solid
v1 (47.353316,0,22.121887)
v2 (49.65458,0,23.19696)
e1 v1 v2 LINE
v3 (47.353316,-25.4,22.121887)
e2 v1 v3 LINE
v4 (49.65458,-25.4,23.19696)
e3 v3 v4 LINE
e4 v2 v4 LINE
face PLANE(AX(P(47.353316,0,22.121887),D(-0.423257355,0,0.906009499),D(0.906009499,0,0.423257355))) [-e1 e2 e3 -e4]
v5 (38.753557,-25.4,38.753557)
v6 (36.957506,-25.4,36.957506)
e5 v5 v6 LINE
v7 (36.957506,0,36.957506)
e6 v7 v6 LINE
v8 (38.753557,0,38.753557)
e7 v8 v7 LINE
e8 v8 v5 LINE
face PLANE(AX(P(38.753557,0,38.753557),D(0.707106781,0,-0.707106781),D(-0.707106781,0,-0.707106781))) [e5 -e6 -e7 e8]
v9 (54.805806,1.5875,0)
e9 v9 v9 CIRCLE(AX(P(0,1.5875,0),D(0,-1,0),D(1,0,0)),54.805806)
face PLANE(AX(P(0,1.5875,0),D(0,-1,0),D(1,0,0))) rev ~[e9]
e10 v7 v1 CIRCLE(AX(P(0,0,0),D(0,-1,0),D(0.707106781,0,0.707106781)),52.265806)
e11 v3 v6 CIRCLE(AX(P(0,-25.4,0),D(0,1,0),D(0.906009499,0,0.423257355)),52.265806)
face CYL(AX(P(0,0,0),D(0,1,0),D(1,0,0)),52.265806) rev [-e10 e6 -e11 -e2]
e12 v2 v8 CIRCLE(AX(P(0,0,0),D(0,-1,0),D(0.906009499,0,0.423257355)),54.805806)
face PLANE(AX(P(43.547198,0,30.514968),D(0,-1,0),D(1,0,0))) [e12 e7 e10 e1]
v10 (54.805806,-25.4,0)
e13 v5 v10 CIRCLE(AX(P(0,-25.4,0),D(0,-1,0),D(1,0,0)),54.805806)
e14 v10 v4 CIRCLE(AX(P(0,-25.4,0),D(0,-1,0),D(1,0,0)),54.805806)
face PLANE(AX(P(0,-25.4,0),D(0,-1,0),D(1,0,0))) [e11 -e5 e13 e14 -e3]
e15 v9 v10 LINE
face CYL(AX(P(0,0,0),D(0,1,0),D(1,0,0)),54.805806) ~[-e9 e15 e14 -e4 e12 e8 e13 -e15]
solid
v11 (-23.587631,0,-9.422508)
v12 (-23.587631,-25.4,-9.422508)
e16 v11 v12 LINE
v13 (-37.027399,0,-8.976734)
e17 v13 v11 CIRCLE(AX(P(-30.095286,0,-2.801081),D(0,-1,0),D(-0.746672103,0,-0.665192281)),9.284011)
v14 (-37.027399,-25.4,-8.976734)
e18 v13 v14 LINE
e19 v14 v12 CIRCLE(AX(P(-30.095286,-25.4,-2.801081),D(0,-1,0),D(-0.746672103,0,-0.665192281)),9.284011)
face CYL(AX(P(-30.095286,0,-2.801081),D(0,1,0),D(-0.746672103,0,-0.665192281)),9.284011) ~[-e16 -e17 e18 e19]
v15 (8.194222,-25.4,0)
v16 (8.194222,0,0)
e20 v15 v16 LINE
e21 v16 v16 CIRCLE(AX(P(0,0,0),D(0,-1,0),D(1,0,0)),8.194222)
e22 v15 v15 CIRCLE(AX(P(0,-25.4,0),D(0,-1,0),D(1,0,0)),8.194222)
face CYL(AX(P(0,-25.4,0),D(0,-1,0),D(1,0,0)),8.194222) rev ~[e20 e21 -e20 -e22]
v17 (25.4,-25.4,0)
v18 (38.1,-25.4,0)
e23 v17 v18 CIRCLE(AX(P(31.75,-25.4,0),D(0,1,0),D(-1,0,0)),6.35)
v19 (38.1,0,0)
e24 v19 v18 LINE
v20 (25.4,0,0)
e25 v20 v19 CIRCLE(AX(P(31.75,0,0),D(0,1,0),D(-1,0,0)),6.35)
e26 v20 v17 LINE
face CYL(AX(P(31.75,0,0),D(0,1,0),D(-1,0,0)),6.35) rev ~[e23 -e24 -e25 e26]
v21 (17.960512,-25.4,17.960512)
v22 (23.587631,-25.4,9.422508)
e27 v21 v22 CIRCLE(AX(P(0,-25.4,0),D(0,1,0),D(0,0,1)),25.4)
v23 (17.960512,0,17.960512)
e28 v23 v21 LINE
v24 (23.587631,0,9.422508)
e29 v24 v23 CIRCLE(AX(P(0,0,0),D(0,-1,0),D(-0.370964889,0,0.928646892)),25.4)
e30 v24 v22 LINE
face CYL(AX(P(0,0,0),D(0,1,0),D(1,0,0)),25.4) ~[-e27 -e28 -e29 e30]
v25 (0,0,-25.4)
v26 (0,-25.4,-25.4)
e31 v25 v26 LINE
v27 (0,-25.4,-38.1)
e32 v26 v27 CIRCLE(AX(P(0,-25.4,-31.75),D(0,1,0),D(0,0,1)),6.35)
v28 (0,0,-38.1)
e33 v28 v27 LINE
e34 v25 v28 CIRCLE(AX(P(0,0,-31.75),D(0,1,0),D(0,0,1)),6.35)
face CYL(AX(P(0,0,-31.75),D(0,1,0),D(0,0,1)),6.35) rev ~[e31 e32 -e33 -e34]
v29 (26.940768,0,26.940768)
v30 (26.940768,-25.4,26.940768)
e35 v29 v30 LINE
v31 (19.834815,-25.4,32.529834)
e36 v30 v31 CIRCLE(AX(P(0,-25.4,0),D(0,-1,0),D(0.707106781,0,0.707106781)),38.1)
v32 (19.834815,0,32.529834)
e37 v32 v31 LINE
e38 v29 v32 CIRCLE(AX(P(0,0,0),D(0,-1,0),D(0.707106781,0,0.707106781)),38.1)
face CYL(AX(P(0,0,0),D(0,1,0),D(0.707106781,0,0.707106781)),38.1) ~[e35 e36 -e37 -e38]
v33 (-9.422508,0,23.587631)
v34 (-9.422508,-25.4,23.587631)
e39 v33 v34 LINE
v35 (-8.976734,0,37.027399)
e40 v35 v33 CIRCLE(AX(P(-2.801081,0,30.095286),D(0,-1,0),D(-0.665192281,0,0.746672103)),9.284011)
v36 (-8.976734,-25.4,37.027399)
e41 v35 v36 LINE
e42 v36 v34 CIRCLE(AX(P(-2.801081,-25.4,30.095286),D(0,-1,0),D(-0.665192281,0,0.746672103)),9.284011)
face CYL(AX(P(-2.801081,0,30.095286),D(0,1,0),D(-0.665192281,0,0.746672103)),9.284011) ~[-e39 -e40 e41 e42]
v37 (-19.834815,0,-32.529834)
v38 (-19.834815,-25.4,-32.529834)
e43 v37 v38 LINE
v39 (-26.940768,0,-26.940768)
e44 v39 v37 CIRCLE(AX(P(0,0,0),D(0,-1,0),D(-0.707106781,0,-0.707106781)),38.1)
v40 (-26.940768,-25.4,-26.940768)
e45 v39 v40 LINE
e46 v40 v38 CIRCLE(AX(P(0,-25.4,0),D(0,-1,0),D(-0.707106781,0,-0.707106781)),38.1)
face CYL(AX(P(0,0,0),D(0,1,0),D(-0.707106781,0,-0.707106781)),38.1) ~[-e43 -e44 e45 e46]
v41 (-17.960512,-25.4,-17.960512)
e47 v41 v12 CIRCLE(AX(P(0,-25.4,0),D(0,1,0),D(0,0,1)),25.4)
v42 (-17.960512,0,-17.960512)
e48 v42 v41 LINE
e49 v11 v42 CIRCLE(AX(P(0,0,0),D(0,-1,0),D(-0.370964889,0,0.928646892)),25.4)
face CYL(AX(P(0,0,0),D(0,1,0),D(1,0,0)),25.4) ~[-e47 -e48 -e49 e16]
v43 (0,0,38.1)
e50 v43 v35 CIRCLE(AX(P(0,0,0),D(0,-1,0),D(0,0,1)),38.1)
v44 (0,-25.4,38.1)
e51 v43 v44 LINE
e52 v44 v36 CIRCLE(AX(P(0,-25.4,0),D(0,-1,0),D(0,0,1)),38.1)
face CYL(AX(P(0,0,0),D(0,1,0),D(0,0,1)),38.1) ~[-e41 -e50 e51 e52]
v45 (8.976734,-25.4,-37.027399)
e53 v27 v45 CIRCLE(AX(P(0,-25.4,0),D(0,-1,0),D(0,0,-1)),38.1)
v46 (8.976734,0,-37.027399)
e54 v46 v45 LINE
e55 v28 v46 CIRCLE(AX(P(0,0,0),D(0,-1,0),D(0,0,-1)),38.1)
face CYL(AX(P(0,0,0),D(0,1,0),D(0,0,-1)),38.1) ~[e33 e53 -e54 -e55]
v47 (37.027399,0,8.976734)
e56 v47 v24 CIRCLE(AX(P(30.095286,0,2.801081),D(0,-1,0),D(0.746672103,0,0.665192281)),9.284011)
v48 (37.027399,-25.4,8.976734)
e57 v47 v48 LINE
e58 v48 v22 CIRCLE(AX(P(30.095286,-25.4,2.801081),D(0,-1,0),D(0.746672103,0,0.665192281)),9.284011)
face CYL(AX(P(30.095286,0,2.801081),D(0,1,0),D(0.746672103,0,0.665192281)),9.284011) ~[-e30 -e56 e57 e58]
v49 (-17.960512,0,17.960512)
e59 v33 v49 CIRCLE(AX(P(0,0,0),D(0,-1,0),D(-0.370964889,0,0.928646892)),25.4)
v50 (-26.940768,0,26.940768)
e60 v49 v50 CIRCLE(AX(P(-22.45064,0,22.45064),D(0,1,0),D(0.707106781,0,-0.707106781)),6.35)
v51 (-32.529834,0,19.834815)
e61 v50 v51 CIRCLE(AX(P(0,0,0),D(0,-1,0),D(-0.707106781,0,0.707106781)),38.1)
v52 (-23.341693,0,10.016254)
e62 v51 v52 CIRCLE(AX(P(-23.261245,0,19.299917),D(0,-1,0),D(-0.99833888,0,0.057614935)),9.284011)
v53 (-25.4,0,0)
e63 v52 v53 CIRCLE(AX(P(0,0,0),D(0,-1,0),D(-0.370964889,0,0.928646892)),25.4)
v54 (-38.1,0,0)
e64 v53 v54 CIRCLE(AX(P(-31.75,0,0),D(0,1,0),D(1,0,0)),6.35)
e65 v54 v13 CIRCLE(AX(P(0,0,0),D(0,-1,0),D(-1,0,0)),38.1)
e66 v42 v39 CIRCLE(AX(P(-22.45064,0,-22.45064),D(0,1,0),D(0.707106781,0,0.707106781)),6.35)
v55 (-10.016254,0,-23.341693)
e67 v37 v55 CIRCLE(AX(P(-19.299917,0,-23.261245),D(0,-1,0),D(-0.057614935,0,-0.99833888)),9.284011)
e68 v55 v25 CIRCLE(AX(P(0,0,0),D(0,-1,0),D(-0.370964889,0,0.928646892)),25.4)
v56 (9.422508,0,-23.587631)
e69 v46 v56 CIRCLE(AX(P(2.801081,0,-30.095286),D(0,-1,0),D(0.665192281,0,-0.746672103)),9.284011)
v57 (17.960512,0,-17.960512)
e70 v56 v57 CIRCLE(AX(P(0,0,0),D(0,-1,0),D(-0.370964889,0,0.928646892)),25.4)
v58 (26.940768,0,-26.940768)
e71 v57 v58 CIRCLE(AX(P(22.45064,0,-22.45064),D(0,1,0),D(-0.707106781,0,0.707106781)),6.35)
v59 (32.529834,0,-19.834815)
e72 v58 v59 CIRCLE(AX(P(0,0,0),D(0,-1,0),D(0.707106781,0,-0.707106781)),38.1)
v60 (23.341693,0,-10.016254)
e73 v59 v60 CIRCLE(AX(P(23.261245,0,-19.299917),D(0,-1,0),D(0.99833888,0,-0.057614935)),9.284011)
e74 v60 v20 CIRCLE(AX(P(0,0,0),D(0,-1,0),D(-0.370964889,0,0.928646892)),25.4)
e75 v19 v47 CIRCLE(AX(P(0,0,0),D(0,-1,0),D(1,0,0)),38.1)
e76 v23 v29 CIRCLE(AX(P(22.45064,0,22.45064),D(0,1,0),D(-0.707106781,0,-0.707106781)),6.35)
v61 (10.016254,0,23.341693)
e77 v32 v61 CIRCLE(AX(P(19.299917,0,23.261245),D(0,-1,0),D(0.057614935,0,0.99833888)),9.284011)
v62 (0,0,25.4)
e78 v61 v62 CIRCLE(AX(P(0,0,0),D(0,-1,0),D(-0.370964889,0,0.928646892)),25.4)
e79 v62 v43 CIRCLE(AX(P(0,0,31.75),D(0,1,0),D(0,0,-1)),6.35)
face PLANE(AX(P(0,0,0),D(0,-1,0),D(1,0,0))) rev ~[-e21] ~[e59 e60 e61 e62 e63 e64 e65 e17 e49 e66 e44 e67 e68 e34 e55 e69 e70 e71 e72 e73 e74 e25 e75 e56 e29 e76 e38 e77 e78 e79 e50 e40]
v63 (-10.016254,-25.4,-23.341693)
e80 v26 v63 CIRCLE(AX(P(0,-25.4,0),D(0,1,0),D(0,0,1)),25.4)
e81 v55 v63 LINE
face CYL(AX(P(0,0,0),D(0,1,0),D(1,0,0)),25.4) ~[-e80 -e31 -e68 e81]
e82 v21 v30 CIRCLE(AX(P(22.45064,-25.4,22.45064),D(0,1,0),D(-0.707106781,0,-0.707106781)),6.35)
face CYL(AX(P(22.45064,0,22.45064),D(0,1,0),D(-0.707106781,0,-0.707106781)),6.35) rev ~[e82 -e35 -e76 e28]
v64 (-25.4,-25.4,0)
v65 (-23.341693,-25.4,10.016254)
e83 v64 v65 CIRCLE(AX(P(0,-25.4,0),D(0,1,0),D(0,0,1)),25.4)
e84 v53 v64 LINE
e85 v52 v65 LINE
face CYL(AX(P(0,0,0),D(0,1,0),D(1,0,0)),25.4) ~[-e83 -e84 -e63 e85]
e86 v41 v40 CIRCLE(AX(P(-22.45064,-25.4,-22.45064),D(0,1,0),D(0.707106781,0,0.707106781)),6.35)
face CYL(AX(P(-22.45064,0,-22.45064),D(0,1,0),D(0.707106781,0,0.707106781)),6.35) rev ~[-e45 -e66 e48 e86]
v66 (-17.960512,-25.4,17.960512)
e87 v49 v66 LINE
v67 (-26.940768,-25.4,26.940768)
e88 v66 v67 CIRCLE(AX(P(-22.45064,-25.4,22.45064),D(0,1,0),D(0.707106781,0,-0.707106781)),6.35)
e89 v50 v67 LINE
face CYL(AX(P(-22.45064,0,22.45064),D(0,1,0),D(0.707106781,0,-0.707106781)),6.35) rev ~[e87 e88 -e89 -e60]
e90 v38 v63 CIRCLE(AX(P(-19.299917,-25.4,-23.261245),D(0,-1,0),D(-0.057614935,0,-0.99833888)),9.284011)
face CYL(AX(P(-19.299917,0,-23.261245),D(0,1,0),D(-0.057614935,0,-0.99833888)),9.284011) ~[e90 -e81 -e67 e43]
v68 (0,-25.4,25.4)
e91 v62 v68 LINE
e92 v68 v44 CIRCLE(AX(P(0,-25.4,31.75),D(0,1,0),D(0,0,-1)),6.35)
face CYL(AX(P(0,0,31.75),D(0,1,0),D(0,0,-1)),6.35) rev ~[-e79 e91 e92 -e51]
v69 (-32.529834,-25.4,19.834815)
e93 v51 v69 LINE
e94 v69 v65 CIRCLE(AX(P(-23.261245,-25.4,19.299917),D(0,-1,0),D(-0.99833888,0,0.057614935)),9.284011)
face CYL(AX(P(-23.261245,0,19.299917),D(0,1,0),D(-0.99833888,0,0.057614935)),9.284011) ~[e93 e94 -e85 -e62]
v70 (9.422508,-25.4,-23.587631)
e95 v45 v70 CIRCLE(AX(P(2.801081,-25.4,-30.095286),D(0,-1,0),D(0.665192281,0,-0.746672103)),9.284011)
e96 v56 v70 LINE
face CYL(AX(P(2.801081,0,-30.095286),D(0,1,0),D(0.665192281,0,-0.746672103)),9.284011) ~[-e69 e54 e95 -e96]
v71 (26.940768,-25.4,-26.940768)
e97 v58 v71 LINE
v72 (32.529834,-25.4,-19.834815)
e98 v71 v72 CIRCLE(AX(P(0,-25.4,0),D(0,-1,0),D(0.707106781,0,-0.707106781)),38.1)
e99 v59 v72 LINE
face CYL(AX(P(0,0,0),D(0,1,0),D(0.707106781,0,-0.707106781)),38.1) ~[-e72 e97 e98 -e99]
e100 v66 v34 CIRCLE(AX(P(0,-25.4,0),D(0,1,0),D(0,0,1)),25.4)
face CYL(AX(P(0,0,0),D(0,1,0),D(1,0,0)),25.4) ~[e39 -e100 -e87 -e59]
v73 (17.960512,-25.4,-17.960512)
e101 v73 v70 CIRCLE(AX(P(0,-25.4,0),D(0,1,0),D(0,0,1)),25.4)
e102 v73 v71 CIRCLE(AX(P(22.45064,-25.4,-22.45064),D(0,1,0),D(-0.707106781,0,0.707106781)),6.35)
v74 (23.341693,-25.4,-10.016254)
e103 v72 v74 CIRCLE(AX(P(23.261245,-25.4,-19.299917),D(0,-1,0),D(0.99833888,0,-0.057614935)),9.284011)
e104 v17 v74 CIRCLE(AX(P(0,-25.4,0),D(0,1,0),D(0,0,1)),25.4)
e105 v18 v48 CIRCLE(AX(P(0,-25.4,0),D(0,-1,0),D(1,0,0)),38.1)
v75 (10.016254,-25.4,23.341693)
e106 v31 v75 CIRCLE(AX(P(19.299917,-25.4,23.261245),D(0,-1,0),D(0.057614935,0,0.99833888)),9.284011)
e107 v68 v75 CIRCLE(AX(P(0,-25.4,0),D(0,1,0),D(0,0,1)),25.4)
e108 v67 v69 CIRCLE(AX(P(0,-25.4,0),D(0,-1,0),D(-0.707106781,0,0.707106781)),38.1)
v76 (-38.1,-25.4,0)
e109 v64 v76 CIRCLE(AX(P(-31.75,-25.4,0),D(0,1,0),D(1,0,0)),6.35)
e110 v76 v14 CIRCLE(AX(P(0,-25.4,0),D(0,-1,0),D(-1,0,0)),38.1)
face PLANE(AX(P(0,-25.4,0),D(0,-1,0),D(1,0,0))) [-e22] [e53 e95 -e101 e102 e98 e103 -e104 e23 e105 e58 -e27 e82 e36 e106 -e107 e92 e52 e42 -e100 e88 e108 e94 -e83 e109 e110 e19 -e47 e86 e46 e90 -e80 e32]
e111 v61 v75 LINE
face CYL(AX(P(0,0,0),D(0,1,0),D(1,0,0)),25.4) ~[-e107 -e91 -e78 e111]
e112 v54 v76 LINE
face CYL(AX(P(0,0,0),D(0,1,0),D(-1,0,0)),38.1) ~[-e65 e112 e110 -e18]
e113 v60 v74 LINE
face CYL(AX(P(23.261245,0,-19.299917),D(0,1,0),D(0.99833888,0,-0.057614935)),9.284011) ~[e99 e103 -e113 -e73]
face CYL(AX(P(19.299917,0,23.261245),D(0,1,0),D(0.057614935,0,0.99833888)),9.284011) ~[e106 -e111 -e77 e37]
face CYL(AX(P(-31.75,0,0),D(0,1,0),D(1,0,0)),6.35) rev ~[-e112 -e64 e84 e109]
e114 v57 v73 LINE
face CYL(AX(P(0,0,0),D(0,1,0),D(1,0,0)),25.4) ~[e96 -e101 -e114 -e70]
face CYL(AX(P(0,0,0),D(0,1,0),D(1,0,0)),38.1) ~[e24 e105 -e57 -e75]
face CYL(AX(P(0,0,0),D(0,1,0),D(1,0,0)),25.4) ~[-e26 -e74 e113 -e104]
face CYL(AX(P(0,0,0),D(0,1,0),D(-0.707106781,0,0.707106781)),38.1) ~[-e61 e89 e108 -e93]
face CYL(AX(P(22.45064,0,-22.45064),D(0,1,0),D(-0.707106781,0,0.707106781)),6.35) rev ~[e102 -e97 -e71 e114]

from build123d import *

# Parameters (mm, degrees)
F0_R            = 25.4
F1_DEPTH        = 25.4
F3_DEPTH        = 25.4
F3_COPIES_COUNT = 8
F5_R            = 54.8058055475
F6_DEPTH        = 1.5875
F7_R            = 54.8058055475
F7_R_2          = 52.2658055475
F8_DEPTH        = 25.4
F9_R            = 8.1942220896
F10_DEPTH       = 26.9885
F12_DEPTH       = 25.4


# Not quite as in the source:
# - a pattern or mirror of a feature is missing from the dataset's text; its kind, count and spacing are read off the source's solid


with BuildPart() as f1:
    # F0 (on Front) → F1 (new body)
    with BuildSketch(Plane.XZ):
        Circle(F0_R)
    extrude(amount=F1_DEPTH)

    # F2 (on Front) → F3 (join, through all)
    with BuildSketch(Plane.XZ):
        with BuildLine():
            ThreePointArc((0, 25.4), (-6.35, 31.75), (0, 38.1))
            ThreePointArc((0, 38.1), (-4.5202939278, 37.8308993127), (-8.9767340917, 37.0273985725))
            ThreePointArc((-8.9767340917, 37.0273985725), (-12.0799901727, 30.403051734), (-9.4225081919, 23.5876310674))
            ThreePointArc((-9.4225081919, 23.5876310674), (-4.7976124733, 24.9427928379), (0, 25.4))
        make_face()
    f3 = extrude(amount=F3_DEPTH)

    # F3_copies: F3 ×8 about axis
    f3_copies_axis = Axis((0, 0, 0), (0, 1, 0))
    for i in range(1, F3_COPIES_COUNT):
        add(f3.rotate(f3_copies_axis, i * 360 / F3_COPIES_COUNT))

    # F9 (on face) → F10 (cut, through all)
    with BuildSketch(Plane.XZ.offset(25.4)):
        Circle(F9_R)
    extrude(amount=-F10_DEPTH, mode=Mode.SUBTRACT)


with BuildPart() as f6:
    # F5 (on Front) → F6 (new body)
    with BuildSketch(Plane.XZ):
        Circle(F5_R)
    extrude(amount=-F6_DEPTH)

    # F7 (on face) → F8 (join)
    with BuildSketch(Plane.XZ):
        Circle(F7_R)
        Circle(F7_R_2, mode=Mode.SUBTRACT)
    extrude(amount=F8_DEPTH)

    # F11 (on face) → F12 (cut, through all)
    with BuildSketch(Plane.XZ):
        with BuildLine():
            Line((47.3533162762, 22.1218866098), (49.6545804025, 23.1969602914))
            ThreePointArc((49.6545804025, 23.1969602914), (44.8831995527, 31.4511481447), (38.753556751, 38.753556751))
            Line((38.753556751, 38.753556751), (36.9575055268, 36.9575055268))
            ThreePointArc((36.9575055268, 36.9575055268), (42.8030672433, 29.9935303706), (47.3533162762, 22.1218866098))
        make_face()
    extrude(amount=F12_DEPTH, mode=Mode.SUBTRACT)


solid = Compound([f1.part, f6.part])
